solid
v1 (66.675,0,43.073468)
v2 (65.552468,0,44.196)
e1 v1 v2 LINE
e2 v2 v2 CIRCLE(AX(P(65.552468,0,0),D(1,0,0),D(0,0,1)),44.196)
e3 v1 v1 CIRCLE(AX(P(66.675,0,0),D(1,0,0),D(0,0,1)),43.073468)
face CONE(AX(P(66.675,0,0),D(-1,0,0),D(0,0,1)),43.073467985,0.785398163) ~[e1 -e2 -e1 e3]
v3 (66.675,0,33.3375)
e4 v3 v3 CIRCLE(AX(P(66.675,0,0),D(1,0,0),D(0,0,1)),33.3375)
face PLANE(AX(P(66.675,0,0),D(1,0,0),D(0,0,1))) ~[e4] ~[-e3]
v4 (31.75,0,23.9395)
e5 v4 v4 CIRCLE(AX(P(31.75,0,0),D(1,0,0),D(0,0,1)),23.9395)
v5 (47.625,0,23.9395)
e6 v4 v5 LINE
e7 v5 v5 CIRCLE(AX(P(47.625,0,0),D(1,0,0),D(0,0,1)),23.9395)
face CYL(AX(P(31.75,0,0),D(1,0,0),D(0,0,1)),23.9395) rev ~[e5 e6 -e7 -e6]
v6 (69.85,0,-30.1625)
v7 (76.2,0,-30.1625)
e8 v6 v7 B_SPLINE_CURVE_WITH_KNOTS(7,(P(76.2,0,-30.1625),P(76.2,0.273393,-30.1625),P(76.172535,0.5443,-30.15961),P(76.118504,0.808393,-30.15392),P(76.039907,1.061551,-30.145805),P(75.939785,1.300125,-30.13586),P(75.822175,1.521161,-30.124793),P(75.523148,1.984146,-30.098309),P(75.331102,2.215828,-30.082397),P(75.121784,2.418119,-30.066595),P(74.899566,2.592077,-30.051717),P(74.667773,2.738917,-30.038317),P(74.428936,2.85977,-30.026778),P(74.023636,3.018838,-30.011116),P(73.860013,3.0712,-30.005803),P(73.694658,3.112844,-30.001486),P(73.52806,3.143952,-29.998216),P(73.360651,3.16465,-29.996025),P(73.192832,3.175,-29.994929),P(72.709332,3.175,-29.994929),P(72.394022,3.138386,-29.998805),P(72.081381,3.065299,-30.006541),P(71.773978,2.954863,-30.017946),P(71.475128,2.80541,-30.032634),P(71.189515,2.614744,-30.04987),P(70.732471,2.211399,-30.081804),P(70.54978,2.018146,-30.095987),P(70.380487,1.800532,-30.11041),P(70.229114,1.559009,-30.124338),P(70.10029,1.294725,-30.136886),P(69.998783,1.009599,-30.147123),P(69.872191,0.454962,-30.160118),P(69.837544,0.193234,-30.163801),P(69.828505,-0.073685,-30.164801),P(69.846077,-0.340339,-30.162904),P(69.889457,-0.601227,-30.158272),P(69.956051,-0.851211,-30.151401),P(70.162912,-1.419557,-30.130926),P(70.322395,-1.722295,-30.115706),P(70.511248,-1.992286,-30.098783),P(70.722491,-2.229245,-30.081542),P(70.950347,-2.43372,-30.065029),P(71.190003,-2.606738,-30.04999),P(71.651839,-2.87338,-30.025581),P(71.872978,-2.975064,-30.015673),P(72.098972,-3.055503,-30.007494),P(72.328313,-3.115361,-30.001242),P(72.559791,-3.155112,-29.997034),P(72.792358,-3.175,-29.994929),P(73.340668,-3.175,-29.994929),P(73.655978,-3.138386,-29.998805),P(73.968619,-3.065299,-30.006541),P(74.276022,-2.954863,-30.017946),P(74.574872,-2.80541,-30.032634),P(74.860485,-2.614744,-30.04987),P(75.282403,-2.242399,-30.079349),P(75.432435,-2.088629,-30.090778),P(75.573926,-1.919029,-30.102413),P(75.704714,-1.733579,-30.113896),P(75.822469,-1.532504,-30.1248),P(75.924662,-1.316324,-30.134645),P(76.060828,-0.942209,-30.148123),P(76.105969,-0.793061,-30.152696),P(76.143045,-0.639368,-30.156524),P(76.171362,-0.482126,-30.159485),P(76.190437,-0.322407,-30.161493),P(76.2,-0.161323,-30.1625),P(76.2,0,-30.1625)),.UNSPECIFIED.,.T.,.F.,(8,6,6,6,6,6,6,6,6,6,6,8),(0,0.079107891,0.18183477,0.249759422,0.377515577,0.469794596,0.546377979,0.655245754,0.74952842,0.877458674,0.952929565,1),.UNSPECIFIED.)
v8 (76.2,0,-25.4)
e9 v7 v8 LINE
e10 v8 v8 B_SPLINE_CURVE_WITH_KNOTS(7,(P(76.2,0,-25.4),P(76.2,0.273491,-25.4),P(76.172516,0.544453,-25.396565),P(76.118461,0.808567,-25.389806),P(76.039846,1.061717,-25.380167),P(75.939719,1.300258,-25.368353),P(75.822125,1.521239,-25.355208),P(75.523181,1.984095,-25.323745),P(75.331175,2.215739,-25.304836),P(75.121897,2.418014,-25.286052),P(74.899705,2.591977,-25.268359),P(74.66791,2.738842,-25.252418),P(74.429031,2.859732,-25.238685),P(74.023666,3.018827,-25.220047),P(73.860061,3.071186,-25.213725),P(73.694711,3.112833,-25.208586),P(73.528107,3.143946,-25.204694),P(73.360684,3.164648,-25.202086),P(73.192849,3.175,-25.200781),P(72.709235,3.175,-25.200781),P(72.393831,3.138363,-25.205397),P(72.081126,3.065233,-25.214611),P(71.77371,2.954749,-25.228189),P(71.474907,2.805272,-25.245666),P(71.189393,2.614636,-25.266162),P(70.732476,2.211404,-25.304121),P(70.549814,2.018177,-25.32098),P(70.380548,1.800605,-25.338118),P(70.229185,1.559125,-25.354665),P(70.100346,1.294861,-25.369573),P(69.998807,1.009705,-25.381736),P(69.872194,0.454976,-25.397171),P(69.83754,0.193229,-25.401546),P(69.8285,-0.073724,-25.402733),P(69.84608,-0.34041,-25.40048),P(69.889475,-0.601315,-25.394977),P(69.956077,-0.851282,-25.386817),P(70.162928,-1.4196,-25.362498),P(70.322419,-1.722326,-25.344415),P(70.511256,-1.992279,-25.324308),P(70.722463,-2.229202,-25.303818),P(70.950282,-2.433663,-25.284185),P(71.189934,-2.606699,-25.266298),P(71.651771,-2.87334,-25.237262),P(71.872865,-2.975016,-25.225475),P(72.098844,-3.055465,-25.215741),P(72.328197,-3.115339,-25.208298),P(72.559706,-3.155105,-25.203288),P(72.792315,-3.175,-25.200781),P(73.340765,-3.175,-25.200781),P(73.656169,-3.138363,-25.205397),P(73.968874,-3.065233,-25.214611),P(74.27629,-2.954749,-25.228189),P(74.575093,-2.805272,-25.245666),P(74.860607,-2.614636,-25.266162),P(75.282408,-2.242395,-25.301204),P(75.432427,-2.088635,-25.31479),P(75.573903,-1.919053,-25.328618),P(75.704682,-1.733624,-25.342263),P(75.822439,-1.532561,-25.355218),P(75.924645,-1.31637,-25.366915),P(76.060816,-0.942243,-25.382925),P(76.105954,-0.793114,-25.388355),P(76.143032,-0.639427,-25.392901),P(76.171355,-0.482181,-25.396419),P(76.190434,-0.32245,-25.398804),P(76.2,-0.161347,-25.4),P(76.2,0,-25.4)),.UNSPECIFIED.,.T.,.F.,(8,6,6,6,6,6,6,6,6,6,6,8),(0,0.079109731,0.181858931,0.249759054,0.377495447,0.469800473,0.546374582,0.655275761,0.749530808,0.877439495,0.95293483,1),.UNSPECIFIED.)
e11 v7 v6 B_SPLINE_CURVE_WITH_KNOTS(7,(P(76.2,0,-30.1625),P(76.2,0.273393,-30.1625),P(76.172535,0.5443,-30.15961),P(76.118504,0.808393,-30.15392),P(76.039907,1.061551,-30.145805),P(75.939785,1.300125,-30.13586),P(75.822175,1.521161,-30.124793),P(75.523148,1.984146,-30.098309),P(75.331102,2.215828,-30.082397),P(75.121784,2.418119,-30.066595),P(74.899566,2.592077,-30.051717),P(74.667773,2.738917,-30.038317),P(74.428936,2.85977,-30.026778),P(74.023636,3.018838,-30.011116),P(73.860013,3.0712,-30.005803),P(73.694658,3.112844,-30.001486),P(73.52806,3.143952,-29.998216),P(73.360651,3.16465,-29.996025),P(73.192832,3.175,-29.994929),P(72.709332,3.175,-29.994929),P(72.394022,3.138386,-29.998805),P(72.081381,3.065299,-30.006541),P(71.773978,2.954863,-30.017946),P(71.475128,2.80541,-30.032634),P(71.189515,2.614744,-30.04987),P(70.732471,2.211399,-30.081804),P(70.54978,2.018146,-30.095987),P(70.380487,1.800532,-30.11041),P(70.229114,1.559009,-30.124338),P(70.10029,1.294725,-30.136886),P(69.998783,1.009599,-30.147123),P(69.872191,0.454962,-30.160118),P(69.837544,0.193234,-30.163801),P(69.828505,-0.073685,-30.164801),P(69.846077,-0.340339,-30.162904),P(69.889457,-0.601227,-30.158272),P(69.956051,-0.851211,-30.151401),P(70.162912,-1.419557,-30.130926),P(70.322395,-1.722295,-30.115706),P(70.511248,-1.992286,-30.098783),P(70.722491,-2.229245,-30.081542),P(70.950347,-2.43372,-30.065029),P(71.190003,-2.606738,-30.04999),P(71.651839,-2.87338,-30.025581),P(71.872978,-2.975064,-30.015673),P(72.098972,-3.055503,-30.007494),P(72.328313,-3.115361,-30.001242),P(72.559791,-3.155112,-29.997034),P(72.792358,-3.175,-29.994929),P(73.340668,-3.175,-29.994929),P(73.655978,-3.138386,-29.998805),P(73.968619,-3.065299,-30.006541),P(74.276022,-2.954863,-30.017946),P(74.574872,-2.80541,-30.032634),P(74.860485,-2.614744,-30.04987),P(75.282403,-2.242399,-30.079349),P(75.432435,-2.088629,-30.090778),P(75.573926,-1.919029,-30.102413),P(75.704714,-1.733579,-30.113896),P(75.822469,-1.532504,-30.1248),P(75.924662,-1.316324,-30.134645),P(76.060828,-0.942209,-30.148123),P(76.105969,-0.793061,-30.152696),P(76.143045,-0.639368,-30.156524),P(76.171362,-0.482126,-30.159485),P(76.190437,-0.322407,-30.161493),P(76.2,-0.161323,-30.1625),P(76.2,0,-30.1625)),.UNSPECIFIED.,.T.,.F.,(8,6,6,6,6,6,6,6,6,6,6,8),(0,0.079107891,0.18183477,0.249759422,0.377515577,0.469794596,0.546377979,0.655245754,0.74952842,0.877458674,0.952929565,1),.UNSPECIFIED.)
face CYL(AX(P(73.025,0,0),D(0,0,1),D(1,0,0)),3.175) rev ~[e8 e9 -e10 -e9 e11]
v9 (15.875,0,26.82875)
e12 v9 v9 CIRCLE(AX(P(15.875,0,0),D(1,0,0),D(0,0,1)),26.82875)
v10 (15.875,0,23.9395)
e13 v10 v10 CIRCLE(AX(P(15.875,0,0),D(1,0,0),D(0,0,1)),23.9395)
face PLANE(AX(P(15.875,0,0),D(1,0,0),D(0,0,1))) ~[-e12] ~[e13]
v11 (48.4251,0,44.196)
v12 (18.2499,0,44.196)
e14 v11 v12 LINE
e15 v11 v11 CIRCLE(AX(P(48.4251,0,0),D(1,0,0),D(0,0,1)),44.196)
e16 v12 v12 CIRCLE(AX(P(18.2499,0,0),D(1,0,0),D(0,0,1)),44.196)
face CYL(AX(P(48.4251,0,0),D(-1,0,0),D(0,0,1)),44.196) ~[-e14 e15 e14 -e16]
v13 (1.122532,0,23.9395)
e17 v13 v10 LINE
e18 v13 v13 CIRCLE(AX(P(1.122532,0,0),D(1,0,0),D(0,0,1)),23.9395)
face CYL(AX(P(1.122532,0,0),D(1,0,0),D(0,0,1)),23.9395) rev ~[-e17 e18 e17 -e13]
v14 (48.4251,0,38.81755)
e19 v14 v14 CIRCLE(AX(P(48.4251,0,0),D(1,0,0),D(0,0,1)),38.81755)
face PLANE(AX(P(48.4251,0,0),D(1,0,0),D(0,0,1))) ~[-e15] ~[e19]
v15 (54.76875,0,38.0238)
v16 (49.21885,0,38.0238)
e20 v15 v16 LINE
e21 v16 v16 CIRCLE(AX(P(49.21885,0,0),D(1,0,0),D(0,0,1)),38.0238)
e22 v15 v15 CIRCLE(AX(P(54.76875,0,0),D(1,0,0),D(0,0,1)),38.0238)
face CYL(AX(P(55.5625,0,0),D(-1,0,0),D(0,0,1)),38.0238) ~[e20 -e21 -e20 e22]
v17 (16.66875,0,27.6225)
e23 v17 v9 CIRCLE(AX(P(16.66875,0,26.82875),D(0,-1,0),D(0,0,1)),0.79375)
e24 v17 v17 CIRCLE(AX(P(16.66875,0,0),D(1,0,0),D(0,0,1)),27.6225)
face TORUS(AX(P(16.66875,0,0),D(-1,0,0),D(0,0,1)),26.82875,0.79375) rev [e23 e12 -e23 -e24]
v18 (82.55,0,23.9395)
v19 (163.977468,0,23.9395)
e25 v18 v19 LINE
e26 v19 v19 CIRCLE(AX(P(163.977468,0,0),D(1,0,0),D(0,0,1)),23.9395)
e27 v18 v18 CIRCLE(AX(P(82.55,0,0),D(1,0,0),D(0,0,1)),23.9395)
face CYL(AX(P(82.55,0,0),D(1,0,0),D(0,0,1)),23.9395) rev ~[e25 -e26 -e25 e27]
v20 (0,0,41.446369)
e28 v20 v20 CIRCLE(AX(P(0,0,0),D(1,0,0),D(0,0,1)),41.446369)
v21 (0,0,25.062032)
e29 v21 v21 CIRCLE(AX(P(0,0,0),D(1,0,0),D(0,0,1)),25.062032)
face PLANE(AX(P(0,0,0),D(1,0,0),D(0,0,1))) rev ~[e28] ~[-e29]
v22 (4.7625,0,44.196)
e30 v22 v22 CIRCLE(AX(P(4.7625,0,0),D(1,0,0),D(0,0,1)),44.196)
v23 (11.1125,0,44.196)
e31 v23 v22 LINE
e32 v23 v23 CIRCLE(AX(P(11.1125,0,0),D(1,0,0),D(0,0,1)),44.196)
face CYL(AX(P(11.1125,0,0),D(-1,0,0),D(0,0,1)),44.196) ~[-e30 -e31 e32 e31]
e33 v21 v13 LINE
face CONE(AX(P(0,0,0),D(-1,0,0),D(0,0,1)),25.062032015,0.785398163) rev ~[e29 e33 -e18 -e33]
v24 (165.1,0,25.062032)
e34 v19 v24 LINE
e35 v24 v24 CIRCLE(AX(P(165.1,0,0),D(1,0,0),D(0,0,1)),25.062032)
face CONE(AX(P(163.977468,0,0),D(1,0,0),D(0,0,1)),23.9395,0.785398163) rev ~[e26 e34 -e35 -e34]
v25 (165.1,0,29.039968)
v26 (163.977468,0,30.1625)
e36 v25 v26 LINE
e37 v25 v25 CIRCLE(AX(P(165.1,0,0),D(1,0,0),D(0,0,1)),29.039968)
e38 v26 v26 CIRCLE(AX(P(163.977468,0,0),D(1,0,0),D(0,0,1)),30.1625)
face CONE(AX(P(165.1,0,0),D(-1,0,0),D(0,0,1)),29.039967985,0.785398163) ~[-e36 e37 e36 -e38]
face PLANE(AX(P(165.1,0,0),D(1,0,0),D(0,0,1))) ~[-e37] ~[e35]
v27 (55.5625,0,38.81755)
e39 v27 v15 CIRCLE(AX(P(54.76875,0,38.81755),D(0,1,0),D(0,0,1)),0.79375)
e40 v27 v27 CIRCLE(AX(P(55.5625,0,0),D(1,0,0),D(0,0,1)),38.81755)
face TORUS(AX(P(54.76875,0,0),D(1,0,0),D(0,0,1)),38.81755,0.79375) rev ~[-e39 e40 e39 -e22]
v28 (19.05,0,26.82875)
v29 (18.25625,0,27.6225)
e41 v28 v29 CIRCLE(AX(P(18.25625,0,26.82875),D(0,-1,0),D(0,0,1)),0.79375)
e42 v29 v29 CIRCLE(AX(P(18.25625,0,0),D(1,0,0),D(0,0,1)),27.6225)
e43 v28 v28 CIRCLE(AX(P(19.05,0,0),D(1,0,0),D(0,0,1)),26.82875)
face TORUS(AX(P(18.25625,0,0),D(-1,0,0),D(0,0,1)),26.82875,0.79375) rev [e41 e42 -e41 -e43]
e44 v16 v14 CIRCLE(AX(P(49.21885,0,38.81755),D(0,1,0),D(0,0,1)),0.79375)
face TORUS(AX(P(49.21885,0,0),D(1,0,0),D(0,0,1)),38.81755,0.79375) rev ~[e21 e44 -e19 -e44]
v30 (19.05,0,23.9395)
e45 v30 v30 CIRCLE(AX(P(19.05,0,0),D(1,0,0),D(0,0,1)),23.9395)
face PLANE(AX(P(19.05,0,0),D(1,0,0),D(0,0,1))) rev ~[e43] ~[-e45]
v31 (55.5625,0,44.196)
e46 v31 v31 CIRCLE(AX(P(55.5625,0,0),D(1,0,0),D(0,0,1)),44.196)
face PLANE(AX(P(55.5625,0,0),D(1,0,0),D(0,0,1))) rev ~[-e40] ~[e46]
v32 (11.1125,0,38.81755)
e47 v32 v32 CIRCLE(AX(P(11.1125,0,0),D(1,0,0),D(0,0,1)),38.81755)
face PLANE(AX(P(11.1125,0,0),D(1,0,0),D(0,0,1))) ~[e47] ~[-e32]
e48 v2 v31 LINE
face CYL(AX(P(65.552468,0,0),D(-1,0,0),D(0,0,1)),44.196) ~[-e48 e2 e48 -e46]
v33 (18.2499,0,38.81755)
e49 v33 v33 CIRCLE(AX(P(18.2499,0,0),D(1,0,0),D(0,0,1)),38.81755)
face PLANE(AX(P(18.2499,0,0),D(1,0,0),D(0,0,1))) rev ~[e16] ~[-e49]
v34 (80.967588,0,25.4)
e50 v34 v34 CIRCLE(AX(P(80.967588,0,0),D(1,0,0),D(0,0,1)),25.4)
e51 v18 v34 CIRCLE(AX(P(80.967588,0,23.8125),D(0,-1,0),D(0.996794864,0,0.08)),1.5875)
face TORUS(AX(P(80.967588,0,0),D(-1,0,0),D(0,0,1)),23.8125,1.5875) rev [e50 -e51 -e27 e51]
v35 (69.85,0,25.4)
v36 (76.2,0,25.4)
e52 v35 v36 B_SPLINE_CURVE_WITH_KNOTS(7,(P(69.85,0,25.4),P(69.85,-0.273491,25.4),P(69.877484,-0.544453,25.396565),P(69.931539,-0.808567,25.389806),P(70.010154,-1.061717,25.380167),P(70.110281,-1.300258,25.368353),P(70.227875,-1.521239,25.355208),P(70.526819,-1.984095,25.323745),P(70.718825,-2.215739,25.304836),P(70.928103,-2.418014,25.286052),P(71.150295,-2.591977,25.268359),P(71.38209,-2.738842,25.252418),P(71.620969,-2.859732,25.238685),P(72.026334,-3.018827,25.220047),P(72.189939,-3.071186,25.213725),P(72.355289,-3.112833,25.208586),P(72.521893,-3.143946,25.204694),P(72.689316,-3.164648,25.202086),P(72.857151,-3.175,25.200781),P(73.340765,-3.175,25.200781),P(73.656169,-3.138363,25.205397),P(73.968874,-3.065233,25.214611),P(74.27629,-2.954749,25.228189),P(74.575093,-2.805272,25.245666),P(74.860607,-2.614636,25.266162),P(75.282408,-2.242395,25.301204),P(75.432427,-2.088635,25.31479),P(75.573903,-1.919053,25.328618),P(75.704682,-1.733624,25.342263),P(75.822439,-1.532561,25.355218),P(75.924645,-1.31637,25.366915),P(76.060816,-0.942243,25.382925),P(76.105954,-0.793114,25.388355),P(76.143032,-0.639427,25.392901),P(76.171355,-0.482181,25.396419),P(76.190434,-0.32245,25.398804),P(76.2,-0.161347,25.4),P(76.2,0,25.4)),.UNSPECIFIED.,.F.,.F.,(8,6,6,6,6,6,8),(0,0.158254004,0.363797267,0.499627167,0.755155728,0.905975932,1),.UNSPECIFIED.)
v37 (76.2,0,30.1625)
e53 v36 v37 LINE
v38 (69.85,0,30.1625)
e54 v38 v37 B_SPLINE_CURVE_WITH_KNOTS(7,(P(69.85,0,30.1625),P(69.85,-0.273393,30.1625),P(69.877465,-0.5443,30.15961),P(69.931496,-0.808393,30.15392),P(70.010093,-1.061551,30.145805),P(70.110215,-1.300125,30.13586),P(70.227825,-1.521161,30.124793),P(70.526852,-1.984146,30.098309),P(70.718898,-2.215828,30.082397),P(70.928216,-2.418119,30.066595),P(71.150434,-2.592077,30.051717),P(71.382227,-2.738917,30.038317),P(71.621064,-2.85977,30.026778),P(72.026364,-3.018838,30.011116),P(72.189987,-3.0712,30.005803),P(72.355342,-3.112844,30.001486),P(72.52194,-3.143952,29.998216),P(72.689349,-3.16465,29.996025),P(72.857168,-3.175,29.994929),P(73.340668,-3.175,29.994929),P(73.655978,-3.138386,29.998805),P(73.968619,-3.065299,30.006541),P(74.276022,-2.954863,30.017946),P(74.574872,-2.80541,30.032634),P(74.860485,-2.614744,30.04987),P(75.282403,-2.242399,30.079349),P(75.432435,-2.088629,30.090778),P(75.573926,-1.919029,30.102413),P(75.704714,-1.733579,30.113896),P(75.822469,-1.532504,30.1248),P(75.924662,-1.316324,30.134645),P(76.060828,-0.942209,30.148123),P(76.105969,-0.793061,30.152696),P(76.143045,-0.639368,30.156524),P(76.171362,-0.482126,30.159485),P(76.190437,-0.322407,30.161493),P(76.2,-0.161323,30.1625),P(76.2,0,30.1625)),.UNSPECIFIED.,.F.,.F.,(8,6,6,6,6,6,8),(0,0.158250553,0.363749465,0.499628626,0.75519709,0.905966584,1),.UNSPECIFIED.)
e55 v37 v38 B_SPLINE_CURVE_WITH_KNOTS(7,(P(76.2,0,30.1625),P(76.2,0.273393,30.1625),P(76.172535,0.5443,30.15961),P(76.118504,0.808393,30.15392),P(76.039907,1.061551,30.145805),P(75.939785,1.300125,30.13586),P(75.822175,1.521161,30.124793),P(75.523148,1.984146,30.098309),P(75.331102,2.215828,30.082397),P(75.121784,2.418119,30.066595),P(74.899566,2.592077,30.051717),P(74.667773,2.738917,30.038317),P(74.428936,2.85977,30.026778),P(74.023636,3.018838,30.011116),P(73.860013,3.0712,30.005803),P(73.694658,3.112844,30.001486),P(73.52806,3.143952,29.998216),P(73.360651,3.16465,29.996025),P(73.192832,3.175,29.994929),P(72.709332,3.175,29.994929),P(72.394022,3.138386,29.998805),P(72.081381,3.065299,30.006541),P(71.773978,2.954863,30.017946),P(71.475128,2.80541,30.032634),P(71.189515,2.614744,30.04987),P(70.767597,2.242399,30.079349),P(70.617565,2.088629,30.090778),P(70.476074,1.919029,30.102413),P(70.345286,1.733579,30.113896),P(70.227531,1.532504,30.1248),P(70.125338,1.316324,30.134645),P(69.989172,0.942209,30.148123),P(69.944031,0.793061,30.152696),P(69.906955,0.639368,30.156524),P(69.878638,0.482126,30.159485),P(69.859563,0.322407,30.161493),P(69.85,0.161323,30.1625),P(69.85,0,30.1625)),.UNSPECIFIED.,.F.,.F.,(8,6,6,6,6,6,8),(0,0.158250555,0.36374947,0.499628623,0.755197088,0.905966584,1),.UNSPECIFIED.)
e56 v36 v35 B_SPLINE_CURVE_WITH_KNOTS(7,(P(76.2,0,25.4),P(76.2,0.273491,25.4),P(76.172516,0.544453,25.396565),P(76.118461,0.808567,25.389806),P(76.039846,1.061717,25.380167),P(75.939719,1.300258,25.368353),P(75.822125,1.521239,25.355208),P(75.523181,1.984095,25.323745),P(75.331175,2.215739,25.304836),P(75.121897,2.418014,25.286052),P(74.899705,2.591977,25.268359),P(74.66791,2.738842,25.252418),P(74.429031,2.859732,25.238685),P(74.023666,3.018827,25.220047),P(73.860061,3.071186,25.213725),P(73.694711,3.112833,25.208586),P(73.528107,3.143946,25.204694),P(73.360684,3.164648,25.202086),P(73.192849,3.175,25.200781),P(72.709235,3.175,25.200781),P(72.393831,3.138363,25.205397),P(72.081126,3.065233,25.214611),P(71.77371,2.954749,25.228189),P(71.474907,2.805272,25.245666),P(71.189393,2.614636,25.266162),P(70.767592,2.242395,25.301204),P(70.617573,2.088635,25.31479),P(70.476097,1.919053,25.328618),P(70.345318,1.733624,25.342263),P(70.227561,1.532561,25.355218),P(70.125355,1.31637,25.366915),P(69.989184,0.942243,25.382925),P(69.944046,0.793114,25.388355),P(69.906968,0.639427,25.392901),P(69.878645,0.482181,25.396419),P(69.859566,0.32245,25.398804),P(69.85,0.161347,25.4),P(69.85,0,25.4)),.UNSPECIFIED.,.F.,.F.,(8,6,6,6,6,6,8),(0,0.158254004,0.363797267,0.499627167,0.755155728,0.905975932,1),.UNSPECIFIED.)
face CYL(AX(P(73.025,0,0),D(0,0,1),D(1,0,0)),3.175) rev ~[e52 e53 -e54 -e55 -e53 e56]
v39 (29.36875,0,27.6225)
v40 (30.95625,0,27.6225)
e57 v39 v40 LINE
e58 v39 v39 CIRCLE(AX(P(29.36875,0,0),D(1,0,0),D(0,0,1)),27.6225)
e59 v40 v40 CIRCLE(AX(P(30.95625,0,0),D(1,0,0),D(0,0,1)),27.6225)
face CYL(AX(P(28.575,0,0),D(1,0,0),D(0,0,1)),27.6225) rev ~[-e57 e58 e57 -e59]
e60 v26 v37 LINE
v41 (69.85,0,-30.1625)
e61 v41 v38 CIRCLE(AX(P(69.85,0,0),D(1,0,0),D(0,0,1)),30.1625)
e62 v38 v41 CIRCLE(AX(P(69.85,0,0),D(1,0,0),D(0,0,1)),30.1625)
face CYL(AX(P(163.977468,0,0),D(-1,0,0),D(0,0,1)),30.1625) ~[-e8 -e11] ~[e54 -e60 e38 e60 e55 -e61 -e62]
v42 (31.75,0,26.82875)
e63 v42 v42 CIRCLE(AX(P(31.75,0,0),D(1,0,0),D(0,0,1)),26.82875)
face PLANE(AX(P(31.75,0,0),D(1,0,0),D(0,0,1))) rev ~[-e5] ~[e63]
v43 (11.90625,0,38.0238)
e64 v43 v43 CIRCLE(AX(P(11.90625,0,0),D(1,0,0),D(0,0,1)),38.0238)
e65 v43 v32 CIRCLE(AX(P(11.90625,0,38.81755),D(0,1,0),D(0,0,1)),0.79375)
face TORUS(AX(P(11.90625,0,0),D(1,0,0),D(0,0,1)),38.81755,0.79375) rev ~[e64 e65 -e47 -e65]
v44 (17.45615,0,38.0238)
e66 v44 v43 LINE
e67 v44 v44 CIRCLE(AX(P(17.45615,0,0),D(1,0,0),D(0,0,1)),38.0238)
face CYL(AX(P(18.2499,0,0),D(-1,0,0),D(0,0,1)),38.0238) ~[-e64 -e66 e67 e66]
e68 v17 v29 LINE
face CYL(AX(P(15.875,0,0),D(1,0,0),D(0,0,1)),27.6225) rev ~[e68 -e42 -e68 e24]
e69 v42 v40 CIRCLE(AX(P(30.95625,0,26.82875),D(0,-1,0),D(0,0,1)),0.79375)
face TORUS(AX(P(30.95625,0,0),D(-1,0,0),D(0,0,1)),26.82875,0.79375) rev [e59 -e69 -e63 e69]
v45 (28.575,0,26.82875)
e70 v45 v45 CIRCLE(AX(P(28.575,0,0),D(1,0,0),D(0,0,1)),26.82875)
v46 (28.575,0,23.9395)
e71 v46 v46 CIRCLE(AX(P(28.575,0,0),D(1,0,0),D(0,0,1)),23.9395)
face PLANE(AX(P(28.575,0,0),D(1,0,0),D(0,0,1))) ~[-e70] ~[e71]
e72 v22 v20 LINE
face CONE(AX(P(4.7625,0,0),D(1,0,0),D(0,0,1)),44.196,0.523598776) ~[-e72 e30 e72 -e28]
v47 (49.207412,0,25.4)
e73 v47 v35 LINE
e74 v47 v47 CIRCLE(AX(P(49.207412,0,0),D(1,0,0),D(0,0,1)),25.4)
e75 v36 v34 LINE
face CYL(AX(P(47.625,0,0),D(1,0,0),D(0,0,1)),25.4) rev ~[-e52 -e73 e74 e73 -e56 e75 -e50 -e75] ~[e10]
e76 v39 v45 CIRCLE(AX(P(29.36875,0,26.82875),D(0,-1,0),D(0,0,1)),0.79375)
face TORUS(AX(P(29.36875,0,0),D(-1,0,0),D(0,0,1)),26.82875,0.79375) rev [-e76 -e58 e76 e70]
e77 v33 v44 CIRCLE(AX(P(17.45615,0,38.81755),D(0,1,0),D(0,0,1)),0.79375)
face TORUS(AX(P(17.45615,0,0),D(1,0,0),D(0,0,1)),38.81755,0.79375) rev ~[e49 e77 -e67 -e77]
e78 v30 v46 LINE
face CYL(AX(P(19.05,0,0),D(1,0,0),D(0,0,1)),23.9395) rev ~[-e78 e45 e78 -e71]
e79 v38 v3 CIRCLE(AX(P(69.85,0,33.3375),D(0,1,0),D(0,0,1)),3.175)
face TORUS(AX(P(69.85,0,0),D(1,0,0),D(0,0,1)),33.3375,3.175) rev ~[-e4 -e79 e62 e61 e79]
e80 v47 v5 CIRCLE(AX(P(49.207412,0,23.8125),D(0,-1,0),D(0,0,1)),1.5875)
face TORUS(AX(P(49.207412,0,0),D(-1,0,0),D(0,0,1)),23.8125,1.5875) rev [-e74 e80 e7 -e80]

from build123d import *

# Parameters (mm, degrees)
F2_R     = 3.175
F4_R     = 0.79375
F5_R     = 3.175
F6_DEPTH = 50.8


# Not quite as in the source:
# - a fillet or chamfer that OpenCascade refuses, or shapes differently, is made with other operations: its cross-section is extruded or revolved along the edge and cut away or added


with BuildPart() as f1:
    # F0 (on Front) → F1 (revolve)
    with BuildSketch(Plane.XZ):
        Polygon((0, 25.0620320151), (1.1225320151, 23.9395), (15.875, 23.9395), (15.875, 27.6225), (19.05, 27.6225), (19.05, 23.9395), (28.575, 23.9395), (28.575, 27.6225), (31.75, 27.6225), (31.75, 23.9395), (47.625, 23.9395), (47.625, 25.4), (82.55, 25.4), (82.55, 23.9395), (163.9774679849, 23.9395), (165.1, 25.0620320151), (165.1, 29.0399679849), (163.9774679849, 30.1625), (66.675, 30.1625), (66.675, 43.0734679849), (65.5524679849, 44.196), (55.5625, 44.196), (55.5625, 38.0238), (48.4251, 38.0238), (48.4251, 44.196), (18.2499, 44.196), (18.2499, 38.0238), (11.1125, 38.0238), (11.1125, 44.196), (4.7625, 44.196), (0, 41.446369343), align=None)
    revolve(axis=Axis((55.6648539445, 0, 0), (1, 0, 0)))

    # F2
    f2_edges = [f1.edges().sort_by_distance(p)[0] for p in [
        (66.675, 0, -30.1625),
    ]]
    fillet(f2_edges, radius=F2_R)

    # F3: fillet of radius 1.5875 on 2 edges, made by hand

    # F3_s1 → F3_t2 (revolve)
    with BuildSketch(Plane.XZ):
        with BuildLine():
            ThreePointArc((49.2074118459, 25.4), (48.1307169611, 24.97906949), (47.625, 23.9395))
            Line((47.625, 23.9395), (47.625, 25.4))
            Line((47.625, 25.4), (49.2074118459, 25.4))
        make_face()
    revolve(axis=Axis((47.625, 0, 0), (1, 0, 0)))

    # F3_s3 → F3_t4 (revolve)
    with BuildSketch(Plane.XZ):
        with BuildLine():
            ThreePointArc((82.55, 23.9395), (82.0442830389, 24.97906949), (80.9675881541, 25.4))
            Line((80.9675881541, 25.4), (82.55, 25.4))
            Line((82.55, 25.4), (82.55, 23.9395))
        make_face()
    revolve(axis=Axis((82.55, 0, 0), (1, 0, 0)))

    # F4
    f4_edges = [f1.edges().sort_by_distance(p)[0] for p in [
        (18.2499, 0, -38.0238),
        (55.5625, 0, -38.0238),
        (19.05, 0, -27.6225),
        (31.75, 0, -27.6225),
        (15.875, 0, -27.6225),
        (28.575, 0, -27.6225),
        (11.1125, 0, -38.0238),
        (48.4251, 0, -38.0238),
    ]]
    fillet(f4_edges, radius=F4_R)

    # F5 (on Top) → F6 (cut, symmetric)
    with BuildSketch(Plane.XY):
        with Locations((73.025, 0)):
            Circle(F5_R)
    extrude(amount=F6_DEPTH, both=True, mode=Mode.SUBTRACT)


solid = f1.part
